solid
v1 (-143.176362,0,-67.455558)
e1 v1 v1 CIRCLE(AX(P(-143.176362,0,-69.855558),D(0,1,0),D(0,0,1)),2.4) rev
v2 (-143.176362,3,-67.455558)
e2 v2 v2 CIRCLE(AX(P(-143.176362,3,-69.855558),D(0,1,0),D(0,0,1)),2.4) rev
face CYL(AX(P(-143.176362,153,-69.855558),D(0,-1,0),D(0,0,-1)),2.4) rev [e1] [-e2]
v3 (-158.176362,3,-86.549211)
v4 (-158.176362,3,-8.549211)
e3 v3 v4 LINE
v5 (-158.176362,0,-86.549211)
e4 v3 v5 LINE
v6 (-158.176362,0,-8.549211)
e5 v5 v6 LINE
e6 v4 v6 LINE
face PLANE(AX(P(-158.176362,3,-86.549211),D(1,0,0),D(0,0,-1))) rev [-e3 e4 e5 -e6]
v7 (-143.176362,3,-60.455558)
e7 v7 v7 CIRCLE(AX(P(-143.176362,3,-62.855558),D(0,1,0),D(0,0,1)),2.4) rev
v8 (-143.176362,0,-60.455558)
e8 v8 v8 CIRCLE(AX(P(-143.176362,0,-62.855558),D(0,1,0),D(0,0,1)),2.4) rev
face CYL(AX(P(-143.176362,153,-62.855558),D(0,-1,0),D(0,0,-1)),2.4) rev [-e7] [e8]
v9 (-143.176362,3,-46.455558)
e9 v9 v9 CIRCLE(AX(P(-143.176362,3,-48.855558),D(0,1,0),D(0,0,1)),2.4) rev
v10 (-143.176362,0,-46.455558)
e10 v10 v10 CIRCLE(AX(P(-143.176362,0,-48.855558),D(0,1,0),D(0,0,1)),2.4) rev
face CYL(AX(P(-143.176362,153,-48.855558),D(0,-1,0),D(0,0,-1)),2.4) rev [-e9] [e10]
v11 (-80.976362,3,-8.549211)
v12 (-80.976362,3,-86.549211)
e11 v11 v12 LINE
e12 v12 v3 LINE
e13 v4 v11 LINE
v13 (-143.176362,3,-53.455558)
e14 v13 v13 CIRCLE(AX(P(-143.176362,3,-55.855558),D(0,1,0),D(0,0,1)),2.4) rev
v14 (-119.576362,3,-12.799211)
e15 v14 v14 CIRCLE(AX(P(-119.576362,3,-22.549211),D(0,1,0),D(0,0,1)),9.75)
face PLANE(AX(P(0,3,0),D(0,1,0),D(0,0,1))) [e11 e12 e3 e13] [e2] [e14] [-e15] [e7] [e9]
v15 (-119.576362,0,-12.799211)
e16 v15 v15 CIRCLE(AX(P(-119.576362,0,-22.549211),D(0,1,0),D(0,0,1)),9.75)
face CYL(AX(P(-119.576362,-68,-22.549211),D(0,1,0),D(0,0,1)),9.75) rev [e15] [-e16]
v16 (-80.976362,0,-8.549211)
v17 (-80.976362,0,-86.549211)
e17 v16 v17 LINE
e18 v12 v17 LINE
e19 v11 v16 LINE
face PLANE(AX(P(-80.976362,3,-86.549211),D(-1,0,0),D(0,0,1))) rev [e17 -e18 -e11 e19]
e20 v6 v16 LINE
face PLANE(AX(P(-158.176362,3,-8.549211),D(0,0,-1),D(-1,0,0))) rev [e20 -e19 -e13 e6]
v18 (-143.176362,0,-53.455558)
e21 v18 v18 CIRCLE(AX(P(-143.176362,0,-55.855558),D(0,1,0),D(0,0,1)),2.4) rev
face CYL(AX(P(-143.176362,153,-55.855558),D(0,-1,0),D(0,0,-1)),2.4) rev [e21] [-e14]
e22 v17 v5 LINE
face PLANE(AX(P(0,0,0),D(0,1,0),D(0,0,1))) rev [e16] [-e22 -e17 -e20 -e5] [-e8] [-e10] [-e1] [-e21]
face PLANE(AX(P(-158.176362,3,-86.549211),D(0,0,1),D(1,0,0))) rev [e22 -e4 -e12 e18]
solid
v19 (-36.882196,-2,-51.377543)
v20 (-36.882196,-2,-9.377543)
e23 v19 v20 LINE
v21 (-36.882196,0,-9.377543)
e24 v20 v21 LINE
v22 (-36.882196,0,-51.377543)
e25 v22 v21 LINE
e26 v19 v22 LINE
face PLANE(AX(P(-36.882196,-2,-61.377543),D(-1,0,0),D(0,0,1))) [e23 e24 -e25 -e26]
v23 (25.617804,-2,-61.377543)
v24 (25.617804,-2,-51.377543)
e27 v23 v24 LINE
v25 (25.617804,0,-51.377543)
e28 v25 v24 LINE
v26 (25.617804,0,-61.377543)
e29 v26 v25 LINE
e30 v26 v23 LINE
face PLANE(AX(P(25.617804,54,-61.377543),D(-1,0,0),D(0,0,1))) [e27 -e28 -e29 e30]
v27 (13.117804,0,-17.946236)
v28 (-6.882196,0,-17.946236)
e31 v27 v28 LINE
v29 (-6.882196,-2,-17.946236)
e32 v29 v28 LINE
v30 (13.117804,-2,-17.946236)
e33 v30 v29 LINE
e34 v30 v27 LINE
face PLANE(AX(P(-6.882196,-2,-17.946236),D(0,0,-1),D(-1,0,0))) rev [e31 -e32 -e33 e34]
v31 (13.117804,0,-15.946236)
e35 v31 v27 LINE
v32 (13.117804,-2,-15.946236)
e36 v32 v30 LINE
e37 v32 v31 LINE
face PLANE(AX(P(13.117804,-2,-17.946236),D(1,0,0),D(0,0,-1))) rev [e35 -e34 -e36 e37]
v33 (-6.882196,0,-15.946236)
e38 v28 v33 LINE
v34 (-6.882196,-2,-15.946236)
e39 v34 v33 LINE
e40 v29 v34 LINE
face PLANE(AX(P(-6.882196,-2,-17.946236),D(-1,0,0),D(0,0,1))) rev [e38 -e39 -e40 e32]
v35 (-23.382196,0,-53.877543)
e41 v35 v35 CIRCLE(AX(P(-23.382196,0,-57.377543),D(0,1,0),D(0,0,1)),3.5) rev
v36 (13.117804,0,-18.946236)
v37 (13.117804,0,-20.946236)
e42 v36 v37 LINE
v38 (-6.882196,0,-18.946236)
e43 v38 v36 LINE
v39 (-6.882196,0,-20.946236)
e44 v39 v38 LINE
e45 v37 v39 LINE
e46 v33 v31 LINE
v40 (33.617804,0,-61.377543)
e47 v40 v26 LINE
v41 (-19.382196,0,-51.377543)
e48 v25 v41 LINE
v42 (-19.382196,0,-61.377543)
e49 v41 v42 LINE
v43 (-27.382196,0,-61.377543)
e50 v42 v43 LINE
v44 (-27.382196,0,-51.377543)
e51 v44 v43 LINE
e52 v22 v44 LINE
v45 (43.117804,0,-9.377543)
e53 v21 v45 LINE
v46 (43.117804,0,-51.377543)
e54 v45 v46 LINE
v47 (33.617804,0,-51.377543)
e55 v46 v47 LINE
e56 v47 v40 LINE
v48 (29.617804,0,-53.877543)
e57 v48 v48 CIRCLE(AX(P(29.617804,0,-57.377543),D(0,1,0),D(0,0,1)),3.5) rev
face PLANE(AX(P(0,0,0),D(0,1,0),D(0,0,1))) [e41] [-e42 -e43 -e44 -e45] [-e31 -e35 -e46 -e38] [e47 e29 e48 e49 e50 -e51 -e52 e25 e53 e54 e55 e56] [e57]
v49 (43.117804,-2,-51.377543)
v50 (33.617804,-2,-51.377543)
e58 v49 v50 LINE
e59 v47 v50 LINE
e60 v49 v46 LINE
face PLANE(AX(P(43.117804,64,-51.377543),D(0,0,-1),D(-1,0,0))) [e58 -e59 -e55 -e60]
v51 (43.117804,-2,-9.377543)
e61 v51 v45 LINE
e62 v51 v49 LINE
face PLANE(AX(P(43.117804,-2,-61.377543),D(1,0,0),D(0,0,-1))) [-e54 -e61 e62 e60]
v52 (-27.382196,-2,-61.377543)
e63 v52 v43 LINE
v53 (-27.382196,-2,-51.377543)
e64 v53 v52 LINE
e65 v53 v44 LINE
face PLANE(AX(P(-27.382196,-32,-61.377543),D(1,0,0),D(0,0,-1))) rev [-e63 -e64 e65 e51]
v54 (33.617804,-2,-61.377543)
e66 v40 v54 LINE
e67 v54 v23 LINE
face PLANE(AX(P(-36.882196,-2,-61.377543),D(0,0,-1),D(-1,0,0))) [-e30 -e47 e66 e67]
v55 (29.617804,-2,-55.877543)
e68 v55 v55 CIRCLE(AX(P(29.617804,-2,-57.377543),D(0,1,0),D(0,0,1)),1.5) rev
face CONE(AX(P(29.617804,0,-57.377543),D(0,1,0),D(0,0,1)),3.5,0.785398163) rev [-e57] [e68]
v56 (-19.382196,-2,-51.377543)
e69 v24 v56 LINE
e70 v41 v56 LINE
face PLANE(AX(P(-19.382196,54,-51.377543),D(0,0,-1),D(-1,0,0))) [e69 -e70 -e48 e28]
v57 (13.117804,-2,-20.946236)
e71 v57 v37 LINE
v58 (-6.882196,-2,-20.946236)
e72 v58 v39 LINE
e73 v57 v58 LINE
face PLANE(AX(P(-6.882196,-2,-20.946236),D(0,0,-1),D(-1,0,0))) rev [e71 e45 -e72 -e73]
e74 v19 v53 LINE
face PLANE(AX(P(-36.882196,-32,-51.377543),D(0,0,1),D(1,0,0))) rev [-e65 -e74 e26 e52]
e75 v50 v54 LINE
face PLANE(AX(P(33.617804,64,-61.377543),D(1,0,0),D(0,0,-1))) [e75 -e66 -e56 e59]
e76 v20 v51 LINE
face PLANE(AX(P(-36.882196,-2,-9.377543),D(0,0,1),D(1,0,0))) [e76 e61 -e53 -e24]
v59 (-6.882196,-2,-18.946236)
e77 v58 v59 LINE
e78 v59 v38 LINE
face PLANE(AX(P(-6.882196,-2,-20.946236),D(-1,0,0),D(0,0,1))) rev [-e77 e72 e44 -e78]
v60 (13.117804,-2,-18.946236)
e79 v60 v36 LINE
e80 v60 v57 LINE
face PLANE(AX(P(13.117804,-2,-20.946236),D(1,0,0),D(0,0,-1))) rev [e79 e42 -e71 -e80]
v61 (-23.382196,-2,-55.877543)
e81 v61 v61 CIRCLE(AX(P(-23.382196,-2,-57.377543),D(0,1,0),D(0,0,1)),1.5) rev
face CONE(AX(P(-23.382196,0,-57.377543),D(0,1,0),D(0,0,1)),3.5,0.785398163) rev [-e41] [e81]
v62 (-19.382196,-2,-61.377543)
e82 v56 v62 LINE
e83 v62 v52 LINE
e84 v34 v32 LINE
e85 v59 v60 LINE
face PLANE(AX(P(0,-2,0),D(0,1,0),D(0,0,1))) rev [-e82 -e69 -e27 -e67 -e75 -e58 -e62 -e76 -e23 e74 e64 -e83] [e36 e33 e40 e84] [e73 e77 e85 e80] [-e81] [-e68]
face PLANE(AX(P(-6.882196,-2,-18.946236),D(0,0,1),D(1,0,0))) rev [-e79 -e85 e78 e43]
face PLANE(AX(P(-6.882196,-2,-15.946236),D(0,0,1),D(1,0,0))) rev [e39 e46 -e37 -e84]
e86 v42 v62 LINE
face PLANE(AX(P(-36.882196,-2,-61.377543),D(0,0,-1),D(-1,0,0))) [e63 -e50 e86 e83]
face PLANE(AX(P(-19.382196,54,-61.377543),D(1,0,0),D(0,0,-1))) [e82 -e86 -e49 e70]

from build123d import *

# Parameters (mm, degrees)
SKETCH_1_W               = 77.2
SKETCH_1_H               = 78
EXTRUDE_1_DEPTH          = 3
CUT_EXTRUDE_1_DEPTH      = 87
CUT_EXTRUDE_1_DEPTH_BACK = 71
SKETCH_2_R               = 9.75
CUT_EXTRUDE_3_DEPTH      = 150
CUT_EXTRUDE_3_DEPTH_BACK = 207
SKETCH_3_R               = 2.4
SKETCH_4_W               = 80
SKETCH_4_H               = 52
EXTRUDE_2_DEPTH          = 2
CUT_EXTRUDE_4_DEPTH      = 35
CUT_EXTRUDE_4_DEPTH_BACK = 32
SKETCH_5_W               = 9.5
SKETCH_5_H               = 10
CUT_EXTRUDE_5_DEPTH      = 54
CUT_EXTRUDE_5_DEPTH_BACK = 45
SKETCH_6_W               = 45
SKETCH_6_H               = 10
CUT_EXTRUDE_6_DEPTH      = 64
CUT_EXTRUDE_6_DEPTH_BACK = 67
SKETCH_7_W               = 9.5
SKETCH_7_H               = 10
CUT_EXTRUDE_7_DEPTH      = 30
CUT_EXTRUDE_7_DEPTH_BACK = 30
SKETCH_8_R               = 1.5
CHAMFER_1_SIZE           = 2
CUT_EXTRUDE_8_DEPTH      = 20
CUT_EXTRUDE_8_DEPTH_BACK = 33
SKETCH_9_R               = 1.5
CHAMFER_2_SIZE           = 2
SKETCH_10_W              = 20
SKETCH_10_H              = 2
CUT_EXTRUDE_9_DEPTH      = 2


with BuildPart() as part:
    # Эскиз1 → Бобышка-Вытянуть1 (new body)
    with BuildSketch(Plane(origin=(0, 0, 0), x_dir=(1, 0, 0), z_dir=(0, 1, 0))):
        with Locations((-119.576362238, 47.549210869)):
            Rectangle(SKETCH_1_W, SKETCH_1_H)
    extrude(amount=EXTRUDE_1_DEPTH)

    # Эскиз2 → Вырез-Вытянуть1 (cut, two sides: drawn at the far end of the back side and taken through both)
    with BuildSketch(Plane(origin=(0, 3, 0), x_dir=(1, 0, 0), z_dir=(0, 1, 0)).offset(-CUT_EXTRUDE_1_DEPTH_BACK)):
        with Locations(Location((-119.576362238, 22.549210869, 0), (0, 0, 270))):
            Circle(SKETCH_2_R)
    extrude(amount=CUT_EXTRUDE_1_DEPTH + CUT_EXTRUDE_1_DEPTH_BACK, mode=Mode.SUBTRACT)

    # Эскиз3 → Вырез-Вытянуть3 (cut, two sides: drawn at the far end of the back side and taken through both)
    with BuildSketch(Plane(origin=(0, 3, 0), x_dir=(1, 0, 0), z_dir=(0, 1, 0)).offset(-CUT_EXTRUDE_3_DEPTH_BACK)):
        with Locations(Location((-143.176362238, 69.855558065, 0), (0, 0, 270))):
            Circle(SKETCH_3_R)
        with Locations(Location((-143.176362238, 62.855558065, 0), (0, 0, 270))):
            Circle(SKETCH_3_R)
        with Locations(Location((-143.176362238, 55.855558065, 0), (0, 0, 270))):
            Circle(SKETCH_3_R)
        with Locations(Location((-143.176362238, 48.855558065, 0), (0, 0, 270))):
            Circle(SKETCH_3_R)
    extrude(amount=CUT_EXTRUDE_3_DEPTH + CUT_EXTRUDE_3_DEPTH_BACK, mode=Mode.SUBTRACT)


with BuildPart() as body_2:
    # Эскиз4 → Бобышка-Вытянуть2 (new body)
    with BuildSketch(Plane(origin=(0, 0, 0), x_dir=(1, 0, 0), z_dir=(0, 1, 0))):
        with Locations((3.117803535, 35.377543141)):
            Rectangle(SKETCH_4_W, SKETCH_4_H)
    extrude(amount=-EXTRUDE_2_DEPTH)

    # Эскиз5 → Вырез-Вытянуть4 (cut, two sides: drawn at the far end of the back side and taken through both)
    with BuildSketch(Plane(origin=(0, 0, 0), x_dir=(1, 0, 0), z_dir=(0, 1, 0)).offset(-CUT_EXTRUDE_4_DEPTH_BACK)):
        with Locations((-32.132196465, 56.377543141)):
            Rectangle(SKETCH_5_W, SKETCH_5_H)
    extrude(amount=CUT_EXTRUDE_4_DEPTH + CUT_EXTRUDE_4_DEPTH_BACK, mode=Mode.SUBTRACT)

    # Эскиз6 → Вырез-Вытянуть5 (cut, two sides: drawn at the far end of the back side and taken through both)
    with BuildSketch(Plane(origin=(0, 0, 0), x_dir=(1, 0, 0), z_dir=(0, 1, 0)).offset(-CUT_EXTRUDE_5_DEPTH_BACK)):
        with Locations((3.117803535, 56.377543141)):
            Rectangle(SKETCH_6_W, SKETCH_6_H)
    extrude(amount=CUT_EXTRUDE_5_DEPTH + CUT_EXTRUDE_5_DEPTH_BACK, mode=Mode.SUBTRACT)

    # Эскиз7 → Вырез-Вытянуть6 (cut, two sides: drawn at the far end of the back side and taken through both)
    with BuildSketch(Plane(origin=(0, 0, 0), x_dir=(1, 0, 0), z_dir=(0, 1, 0)).offset(-CUT_EXTRUDE_6_DEPTH_BACK)):
        with Locations((38.367803535, 56.377543141)):
            Rectangle(SKETCH_7_W, SKETCH_7_H)
    extrude(amount=CUT_EXTRUDE_6_DEPTH + CUT_EXTRUDE_6_DEPTH_BACK, mode=Mode.SUBTRACT)

    # Эскиз8 → Вырез-Вытянуть7 (cut, two sides: drawn at the far end of the back side and taken through both)
    with BuildSketch(Plane(origin=(0, 0, 0), x_dir=(1, 0, 0), z_dir=(0, 1, 0)).offset(-CUT_EXTRUDE_7_DEPTH_BACK)):
        with Locations(Location((-23.382196465, 57.377543141, 0), (0, 0, 270))):
            Circle(SKETCH_8_R)
    extrude(amount=CUT_EXTRUDE_7_DEPTH + CUT_EXTRUDE_7_DEPTH_BACK, mode=Mode.SUBTRACT)

    # Фаска1
    chamfer_1_edges = [body_2.edges().sort_by_distance(p)[0] for p in [
        (-23.382196465, 0, -58.877543141),
    ]]
    chamfer(chamfer_1_edges, length=CHAMFER_1_SIZE - 0.0001)  # a hair under: the kernel refuses the full size

    # Эскиз9 → Вырез-Вытянуть8 (cut, two sides: drawn at the far end of the back side and taken through both)
    with BuildSketch(Plane(origin=(0, 0, 0), x_dir=(1, 0, 0), z_dir=(0, 1, 0)).offset(-CUT_EXTRUDE_8_DEPTH_BACK)):
        with Locations(Location((29.617803535, 57.377543141, 0), (0, 0, 270))):
            Circle(SKETCH_9_R)
    extrude(amount=CUT_EXTRUDE_8_DEPTH + CUT_EXTRUDE_8_DEPTH_BACK, mode=Mode.SUBTRACT)

    # Фаска2
    chamfer_2_edges = [body_2.edges().sort_by_distance(p)[0] for p in [
        (29.617803535, 0, -58.877543141),
    ]]
    chamfer(chamfer_2_edges, length=CHAMFER_2_SIZE - 0.0001)  # a hair under: the kernel refuses the full size

    # Эскиз10 → Вырез-Вытянуть9 (cut)
    with BuildSketch(Plane(origin=(0, 0, 0), x_dir=(1, 0, 0), z_dir=(0, 1, 0))):
        with Locations((3.117803535, 16.946236335)):
            Rectangle(SKETCH_10_W, SKETCH_10_H)
        with Locations((3.117803535, 19.946236335)):
            Rectangle(SKETCH_10_W, SKETCH_10_H)
    extrude(amount=-CUT_EXTRUDE_9_DEPTH, mode=Mode.SUBTRACT)


solid = Compound([part.part, body_2.part])
